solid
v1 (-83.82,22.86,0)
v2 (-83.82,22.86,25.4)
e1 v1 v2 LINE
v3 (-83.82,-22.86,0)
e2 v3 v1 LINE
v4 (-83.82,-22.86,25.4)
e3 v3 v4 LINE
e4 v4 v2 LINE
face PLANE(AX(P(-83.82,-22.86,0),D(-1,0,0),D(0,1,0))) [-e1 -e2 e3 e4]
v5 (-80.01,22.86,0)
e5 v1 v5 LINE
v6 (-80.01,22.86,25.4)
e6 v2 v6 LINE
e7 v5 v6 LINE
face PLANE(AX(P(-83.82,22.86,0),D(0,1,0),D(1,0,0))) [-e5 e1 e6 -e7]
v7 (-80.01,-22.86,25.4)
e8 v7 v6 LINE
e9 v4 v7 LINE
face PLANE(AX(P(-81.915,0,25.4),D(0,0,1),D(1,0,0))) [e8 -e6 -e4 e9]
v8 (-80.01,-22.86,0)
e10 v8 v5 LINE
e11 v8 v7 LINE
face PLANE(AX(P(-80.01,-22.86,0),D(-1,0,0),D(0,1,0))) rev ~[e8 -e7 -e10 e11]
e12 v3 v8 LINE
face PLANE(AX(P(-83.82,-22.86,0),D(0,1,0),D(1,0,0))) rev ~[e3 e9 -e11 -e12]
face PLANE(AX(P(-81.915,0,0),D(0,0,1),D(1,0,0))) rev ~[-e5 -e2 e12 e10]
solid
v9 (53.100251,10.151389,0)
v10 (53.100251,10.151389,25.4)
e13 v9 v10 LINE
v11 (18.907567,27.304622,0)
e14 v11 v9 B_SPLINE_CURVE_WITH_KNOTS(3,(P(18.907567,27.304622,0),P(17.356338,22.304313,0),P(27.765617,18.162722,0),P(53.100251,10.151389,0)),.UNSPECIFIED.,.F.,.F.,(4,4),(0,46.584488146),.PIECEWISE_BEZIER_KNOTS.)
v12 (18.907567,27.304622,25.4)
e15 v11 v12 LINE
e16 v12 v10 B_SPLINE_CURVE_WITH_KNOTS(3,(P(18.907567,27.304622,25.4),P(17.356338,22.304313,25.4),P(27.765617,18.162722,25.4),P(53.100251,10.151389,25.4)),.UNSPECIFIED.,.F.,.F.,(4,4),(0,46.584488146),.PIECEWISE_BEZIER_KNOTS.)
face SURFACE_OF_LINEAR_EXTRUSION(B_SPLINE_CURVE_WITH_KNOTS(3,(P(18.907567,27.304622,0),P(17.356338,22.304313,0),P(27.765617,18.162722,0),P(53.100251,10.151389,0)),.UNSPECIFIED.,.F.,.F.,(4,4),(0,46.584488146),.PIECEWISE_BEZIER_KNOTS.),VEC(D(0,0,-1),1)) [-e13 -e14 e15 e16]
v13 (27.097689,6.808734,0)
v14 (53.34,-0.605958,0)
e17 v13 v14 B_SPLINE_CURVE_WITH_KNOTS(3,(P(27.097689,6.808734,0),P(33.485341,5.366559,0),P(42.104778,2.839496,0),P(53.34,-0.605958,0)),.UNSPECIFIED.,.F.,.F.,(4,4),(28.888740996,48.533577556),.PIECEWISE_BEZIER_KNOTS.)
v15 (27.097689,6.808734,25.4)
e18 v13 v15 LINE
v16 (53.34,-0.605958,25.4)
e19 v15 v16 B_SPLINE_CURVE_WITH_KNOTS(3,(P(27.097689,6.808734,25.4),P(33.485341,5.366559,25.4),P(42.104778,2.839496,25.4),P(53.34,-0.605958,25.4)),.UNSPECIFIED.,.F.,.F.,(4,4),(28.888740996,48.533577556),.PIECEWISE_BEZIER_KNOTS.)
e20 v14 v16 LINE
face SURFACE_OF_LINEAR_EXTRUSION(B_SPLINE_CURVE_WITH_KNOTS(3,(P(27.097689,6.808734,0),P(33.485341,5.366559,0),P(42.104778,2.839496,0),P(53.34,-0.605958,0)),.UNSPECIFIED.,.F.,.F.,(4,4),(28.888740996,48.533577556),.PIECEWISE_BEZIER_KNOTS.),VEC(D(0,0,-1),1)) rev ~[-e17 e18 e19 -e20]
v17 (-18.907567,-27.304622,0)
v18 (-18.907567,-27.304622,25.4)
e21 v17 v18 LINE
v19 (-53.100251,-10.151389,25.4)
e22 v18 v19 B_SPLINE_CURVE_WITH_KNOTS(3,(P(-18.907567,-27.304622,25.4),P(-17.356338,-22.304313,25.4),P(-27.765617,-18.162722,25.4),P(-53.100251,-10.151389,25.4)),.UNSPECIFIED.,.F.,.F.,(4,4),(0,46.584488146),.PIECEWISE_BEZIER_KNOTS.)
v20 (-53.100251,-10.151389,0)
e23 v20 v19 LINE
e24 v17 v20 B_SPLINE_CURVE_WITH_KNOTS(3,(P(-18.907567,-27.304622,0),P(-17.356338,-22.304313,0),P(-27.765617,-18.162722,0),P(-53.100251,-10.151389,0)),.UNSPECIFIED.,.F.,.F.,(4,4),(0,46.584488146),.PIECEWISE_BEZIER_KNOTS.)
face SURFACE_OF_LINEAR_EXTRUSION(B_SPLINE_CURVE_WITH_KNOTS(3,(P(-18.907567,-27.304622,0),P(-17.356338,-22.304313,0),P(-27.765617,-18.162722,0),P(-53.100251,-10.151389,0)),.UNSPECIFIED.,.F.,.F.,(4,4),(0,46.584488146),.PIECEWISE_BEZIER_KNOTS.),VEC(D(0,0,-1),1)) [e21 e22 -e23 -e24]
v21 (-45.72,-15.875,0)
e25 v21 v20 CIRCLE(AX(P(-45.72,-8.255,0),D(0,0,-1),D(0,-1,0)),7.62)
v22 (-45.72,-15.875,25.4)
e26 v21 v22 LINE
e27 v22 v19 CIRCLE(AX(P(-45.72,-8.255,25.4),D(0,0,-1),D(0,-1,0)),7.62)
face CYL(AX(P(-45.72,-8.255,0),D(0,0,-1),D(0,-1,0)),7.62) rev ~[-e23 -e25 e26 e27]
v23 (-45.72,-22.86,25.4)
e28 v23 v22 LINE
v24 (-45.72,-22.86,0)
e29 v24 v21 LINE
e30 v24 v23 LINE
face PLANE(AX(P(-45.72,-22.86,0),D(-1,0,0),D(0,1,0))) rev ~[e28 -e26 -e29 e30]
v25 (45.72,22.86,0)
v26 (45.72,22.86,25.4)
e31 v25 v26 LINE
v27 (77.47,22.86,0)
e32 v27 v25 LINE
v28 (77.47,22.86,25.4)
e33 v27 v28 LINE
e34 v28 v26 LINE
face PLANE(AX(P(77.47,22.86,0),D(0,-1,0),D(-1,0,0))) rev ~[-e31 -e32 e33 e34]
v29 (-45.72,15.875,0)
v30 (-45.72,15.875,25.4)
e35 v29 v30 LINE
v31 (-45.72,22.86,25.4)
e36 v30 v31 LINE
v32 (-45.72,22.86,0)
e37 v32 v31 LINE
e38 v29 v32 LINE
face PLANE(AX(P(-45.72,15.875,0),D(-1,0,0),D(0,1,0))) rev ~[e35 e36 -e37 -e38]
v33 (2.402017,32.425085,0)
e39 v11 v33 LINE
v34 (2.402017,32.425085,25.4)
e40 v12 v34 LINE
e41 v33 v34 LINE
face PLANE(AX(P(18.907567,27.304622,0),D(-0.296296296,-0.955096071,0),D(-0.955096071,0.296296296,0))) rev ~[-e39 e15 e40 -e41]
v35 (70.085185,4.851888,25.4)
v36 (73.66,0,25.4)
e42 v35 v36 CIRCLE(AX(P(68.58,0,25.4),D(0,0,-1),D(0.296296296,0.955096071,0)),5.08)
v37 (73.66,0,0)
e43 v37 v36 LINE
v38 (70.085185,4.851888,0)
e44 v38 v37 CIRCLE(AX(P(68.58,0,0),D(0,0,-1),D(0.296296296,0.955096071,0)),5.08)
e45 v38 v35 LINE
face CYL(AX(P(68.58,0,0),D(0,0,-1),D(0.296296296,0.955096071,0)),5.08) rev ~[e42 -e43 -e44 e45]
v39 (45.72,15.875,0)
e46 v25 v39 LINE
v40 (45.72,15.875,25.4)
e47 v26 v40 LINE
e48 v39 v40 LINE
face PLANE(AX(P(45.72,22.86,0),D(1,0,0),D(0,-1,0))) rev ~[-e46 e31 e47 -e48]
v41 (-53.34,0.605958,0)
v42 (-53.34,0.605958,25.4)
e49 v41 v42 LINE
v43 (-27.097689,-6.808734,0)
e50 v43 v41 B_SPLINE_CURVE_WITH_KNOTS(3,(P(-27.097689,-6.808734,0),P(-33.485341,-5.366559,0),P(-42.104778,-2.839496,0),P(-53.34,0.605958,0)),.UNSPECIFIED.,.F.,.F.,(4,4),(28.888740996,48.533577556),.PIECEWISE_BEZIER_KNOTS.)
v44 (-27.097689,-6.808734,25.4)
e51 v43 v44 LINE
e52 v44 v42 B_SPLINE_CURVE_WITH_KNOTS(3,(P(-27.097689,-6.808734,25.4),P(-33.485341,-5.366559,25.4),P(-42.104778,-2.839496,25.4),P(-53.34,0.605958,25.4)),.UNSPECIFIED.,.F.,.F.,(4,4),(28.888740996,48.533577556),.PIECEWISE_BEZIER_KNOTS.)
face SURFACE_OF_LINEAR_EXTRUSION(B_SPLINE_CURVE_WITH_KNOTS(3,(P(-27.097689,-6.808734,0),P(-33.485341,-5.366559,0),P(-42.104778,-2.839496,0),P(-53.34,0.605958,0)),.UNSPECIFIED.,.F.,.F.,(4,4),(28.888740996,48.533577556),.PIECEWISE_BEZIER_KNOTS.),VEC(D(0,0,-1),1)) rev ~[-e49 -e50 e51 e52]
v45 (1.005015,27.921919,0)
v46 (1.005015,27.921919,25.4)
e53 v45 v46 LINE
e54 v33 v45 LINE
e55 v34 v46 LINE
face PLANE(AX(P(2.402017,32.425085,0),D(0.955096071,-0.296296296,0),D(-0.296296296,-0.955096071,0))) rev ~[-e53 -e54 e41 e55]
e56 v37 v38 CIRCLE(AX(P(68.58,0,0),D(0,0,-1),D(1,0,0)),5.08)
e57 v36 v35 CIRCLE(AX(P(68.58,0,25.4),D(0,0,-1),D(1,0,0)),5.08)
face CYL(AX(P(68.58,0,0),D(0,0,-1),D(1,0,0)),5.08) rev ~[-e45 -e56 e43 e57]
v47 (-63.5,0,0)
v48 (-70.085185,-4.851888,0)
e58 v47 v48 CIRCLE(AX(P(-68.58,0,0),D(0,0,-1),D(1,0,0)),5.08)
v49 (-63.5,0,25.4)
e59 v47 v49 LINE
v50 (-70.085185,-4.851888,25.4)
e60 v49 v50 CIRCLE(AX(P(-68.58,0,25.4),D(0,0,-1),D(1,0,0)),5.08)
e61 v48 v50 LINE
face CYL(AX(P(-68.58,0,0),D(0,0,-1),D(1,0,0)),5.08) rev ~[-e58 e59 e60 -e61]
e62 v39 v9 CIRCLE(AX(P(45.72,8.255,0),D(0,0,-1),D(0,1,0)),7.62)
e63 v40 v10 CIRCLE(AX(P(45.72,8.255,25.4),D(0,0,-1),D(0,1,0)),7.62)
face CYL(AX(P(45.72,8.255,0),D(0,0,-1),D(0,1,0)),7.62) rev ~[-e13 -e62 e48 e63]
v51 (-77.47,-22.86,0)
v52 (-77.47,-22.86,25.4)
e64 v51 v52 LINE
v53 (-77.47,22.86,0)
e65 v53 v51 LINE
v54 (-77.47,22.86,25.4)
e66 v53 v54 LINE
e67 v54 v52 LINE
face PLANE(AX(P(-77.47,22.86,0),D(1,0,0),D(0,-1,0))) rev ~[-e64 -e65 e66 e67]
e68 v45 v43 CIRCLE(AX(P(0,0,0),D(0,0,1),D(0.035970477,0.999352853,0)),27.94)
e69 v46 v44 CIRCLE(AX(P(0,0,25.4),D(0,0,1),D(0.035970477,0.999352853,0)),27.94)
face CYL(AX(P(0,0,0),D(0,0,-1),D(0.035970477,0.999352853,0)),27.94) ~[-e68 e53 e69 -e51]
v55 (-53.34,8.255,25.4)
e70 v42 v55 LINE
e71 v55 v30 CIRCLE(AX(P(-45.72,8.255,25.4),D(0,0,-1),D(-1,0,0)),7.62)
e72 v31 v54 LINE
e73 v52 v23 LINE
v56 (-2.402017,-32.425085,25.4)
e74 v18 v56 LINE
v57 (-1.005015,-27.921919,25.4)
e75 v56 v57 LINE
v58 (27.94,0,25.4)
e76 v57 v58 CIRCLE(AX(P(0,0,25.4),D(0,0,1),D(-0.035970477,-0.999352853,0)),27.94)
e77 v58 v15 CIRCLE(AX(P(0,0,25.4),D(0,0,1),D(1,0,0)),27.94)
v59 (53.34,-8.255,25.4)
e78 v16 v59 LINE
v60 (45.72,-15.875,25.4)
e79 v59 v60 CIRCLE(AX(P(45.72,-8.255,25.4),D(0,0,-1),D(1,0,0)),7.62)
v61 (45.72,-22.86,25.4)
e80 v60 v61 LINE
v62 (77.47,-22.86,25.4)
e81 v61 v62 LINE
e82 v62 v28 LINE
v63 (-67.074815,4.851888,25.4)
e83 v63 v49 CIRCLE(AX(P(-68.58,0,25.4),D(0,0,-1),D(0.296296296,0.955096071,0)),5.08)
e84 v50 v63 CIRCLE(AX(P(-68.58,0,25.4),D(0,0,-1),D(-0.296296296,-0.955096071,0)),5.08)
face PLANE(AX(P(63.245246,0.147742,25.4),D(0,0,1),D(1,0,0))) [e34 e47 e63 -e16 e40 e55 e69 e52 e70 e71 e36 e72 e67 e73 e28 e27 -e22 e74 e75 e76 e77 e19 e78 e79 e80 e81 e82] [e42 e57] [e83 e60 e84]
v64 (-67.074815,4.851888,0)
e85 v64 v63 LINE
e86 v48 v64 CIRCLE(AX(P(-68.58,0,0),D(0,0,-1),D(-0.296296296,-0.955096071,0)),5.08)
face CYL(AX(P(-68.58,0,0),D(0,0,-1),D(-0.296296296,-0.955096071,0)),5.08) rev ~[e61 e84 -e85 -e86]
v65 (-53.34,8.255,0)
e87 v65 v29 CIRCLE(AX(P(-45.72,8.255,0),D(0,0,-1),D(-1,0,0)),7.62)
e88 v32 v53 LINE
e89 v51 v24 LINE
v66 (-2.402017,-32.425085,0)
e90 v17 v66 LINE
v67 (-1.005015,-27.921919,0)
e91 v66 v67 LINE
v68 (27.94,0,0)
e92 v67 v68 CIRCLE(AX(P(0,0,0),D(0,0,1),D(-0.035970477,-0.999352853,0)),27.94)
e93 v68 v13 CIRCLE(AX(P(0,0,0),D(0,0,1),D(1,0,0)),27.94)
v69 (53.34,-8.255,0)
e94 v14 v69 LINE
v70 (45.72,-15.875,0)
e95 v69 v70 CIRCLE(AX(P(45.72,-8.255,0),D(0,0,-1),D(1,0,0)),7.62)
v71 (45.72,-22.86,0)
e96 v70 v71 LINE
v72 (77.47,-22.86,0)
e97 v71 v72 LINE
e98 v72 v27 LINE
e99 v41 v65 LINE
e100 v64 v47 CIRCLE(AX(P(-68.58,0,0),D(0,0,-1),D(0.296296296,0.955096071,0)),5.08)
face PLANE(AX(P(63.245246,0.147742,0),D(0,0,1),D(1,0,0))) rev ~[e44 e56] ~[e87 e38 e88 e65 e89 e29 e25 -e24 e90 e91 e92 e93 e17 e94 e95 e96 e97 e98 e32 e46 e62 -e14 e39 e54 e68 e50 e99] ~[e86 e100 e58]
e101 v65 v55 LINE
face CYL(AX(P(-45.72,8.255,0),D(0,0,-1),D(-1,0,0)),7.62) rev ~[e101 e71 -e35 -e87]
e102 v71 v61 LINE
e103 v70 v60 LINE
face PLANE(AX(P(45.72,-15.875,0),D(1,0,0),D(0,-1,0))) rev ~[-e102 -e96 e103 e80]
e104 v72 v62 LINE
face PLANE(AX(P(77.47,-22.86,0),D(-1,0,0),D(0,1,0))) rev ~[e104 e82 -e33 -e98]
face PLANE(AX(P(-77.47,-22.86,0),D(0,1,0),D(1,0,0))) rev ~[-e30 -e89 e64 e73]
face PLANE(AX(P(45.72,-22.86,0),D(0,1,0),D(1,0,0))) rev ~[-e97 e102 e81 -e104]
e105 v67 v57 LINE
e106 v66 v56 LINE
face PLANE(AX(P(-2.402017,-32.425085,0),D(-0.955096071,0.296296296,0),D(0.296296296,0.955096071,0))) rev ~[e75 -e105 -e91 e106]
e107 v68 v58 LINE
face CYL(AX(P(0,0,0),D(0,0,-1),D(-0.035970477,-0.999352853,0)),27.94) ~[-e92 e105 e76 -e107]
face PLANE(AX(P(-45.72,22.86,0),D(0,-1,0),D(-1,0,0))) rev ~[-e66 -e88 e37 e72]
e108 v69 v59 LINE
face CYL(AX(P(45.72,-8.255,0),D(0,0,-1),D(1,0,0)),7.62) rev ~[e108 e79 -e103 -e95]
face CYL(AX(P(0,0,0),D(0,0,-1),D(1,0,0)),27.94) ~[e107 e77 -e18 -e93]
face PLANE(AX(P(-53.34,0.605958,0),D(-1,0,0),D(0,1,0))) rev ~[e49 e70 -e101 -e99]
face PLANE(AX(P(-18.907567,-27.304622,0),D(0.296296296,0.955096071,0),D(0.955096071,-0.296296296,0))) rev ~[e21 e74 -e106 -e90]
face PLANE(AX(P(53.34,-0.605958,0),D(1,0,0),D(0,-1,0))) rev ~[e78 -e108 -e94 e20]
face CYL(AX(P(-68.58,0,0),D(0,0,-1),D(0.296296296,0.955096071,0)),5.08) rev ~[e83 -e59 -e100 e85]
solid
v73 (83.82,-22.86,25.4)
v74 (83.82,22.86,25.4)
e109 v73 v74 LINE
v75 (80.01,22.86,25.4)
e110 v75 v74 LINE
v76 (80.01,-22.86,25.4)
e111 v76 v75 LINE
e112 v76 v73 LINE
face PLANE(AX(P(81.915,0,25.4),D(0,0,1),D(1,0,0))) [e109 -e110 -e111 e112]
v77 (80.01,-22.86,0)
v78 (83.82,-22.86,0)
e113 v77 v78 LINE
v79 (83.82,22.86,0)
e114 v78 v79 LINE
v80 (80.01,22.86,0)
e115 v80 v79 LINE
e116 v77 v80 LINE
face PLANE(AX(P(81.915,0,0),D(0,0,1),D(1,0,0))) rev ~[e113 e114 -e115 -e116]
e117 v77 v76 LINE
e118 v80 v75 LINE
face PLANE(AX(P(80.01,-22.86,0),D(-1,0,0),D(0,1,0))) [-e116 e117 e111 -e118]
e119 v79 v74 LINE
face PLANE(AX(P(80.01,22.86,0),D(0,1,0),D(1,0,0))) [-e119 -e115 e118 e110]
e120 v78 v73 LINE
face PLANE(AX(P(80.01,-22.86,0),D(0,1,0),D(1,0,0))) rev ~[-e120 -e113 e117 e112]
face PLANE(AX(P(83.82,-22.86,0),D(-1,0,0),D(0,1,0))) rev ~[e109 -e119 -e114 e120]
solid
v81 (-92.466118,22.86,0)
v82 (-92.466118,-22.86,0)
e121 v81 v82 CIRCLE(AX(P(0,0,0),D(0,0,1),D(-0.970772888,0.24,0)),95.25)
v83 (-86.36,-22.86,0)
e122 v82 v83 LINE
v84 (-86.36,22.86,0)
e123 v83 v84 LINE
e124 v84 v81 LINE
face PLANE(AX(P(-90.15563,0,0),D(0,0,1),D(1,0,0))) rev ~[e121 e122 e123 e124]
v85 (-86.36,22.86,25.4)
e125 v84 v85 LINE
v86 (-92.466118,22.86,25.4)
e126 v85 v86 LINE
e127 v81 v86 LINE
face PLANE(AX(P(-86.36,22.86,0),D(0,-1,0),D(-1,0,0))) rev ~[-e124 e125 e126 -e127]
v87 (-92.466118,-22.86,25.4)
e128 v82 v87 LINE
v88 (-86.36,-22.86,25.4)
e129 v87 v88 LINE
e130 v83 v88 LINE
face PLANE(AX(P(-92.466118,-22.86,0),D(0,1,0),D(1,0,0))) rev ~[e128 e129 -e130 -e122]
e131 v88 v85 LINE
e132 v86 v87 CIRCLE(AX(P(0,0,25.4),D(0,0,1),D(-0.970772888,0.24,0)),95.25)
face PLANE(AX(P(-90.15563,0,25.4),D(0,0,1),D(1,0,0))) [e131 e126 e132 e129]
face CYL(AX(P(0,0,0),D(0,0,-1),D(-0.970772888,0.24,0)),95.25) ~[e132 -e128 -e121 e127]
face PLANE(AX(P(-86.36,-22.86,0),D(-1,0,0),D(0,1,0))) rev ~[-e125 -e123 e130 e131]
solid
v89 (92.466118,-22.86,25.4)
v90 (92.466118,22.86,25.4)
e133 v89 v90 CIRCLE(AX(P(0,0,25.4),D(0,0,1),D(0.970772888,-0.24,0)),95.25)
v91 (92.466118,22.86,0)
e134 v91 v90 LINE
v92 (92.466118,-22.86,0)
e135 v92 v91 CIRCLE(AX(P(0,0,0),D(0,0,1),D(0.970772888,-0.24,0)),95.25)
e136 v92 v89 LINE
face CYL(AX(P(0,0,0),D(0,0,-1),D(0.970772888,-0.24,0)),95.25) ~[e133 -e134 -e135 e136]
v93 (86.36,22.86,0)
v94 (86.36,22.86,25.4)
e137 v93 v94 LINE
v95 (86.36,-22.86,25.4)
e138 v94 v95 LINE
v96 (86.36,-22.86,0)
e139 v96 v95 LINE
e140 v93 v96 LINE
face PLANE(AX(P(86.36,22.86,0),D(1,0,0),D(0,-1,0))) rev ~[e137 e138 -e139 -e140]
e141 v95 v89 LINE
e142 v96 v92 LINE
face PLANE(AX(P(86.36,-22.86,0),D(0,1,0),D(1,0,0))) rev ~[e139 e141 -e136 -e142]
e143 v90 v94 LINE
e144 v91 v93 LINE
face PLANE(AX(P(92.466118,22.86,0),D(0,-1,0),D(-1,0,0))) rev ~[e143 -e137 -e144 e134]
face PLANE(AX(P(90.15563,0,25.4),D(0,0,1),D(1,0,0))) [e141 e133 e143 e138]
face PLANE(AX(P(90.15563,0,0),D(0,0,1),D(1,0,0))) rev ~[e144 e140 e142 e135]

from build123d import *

# Parameters (mm, degrees)
F0_DEPTH = 25.4
F1_W     = 3.81
F1_H     = 45.72


with BuildPart() as f0:
    # F1 (on Top) → F0 (new body)
    with BuildSketch(Plane.XY):
        with BuildLine():
            Line((77.47, 22.86), (45.72, 22.86))
            Line((45.72, 22.86), (45.72, 15.875))
            ThreePointArc((45.72, 15.875), (50.3897919484, 14.2764153784), (53.1002511947, 10.1513892806))
            add(Edge.make_bspline(
                [(53.1002511947, 10.1513892806), (58.1589510072, 8.551724236), (63.812727866, 6.7977717351), (70.0851851843, 4.8518880408)],
                knots=[46.5844881463, 46.5844881463, 46.5844881463, 46.5844881463, 55.8862582945, 55.8862582945, 55.8862582945, 55.8862582945], degree=3))
            ThreePointArc((70.0851851843, 4.8518880408), (72.6697885481, 3.0133087515), (73.66, 0))
            ThreePointArc((73.66, 0), (71.5933087511, -4.0897885484), (67.0748148148, -4.8518880406))
            add(Edge.make_bspline(
                [(53.34, -0.6059576), (57.5451254916, -1.8955240295), (62.1166858374, -3.3137440808), (67.0748148148, -4.8518880406)],
                knots=[48.5335775556, 48.5335775556, 48.5335775556, 48.5335775556, 55.8862582953, 55.8862582953, 55.8862582953, 55.8862582953], degree=3))
            Line((53.34, -0.6059576), (53.34, -8.255))
            ThreePointArc((53.34, -8.255), (51.1081536726, -13.6431536726), (45.72, -15.875))
            Line((45.72, -15.875), (45.72, -22.86))
            Line((45.72, -22.86), (77.47, -22.86))
            Line((77.47, -22.86), (77.47, 22.86))
        make_face()
        with BuildLine():
            add(Edge.make_bspline(
                [(53.1002511947, 10.1513892806), (58.1589510072, 8.551724236), (63.812727866, 6.7977717351), (70.0851851843, 4.8518880408)],
                knots=[46.5844881463, 46.5844881463, 46.5844881463, 46.5844881463, 55.8862582945, 55.8862582945, 55.8862582945, 55.8862582945], degree=3))
            ThreePointArc((53.1002511947, 10.1513892806), (53.2798251998, 9.210742093), (53.34, 8.255))
            Line((53.34, 8.255), (53.34, -0.6059576))
            add(Edge.make_bspline(
                [(53.34, -0.6059576), (57.5451254916, -1.8955240295), (62.1166858374, -3.3137440808), (67.0748148148, -4.8518880406)],
                knots=[48.5335775556, 48.5335775556, 48.5335775556, 48.5335775556, 55.8862582953, 55.8862582953, 55.8862582953, 55.8862582953], degree=3))
            ThreePointArc((67.0748148148, -4.8518880406), (63.7281119593, 1.5051851848), (70.0851851843, 4.8518880408))
        make_face()
        with BuildLine():
            ThreePointArc((53.34, 8.255), (53.2798251998, 9.210742093), (53.1002511947, 10.1513892806))
            add(Edge.make_bspline(
                [(18.9075672089, 27.3046224959), (17.3563376005, 22.3043125946), (27.7656172811, 18.1627221903), (53.1002511947, 10.1513892806)],
                knots=[0, 0, 0, 0, 46.5844881463, 46.5844881463, 46.5844881463, 46.5844881463], degree=3))
            Line((18.9075672089, 27.3046224959), (2.4020174164, 32.4250846362))
            Line((2.4020174164, 32.4250846362), (1.0050151405, 27.9219187121))
            ThreePointArc((1.0050151405, 27.9219187121), (17.5750428532, 21.7200706423), (27.0976887869, 6.8087342735))
            add(Edge.make_bspline(
                [(27.0976887869, 6.8087342735), (33.4853412167, 5.3665593675), (42.104777648, 2.8394961928), (53.34, -0.6059576)],
                knots=[28.888740996, 28.888740996, 28.888740996, 28.888740996, 48.5335775556, 48.5335775556, 48.5335775556, 48.5335775556], degree=3))
            Line((53.34, -0.6059576), (53.34, 8.255))
        make_face()
        with BuildLine():
            ThreePointArc((27.94, 0), (27.7286226191, 3.4303188841), (27.0976887869, 6.8087342735))
            ThreePointArc((27.0976887869, 6.8087342735), (17.5750428532, 21.7200706423), (1.0050151405, 27.9219187121))
            ThreePointArc((1.0050151405, 27.9219187121), (-21.7200706423, 17.5750428532), (-27.0976887869, -6.8087342735))
            ThreePointArc((-27.0976887869, -6.8087342735), (-17.5750428532, -21.7200706423), (-1.0050151405, -27.9219187121))
            ThreePointArc((-1.0050151405, -27.9219187121), (19.3979828458, -20.108750869), (27.94, 0))
        make_face()
        with BuildLine():
            ThreePointArc((-1.0050151405, -27.9219187121), (-17.5750428532, -21.7200706423), (-27.0976887869, -6.8087342735))
            add(Edge.make_bspline(
                [(-27.0976887869, -6.8087342735), (-33.4853412167, -5.3665593675), (-42.104777648, -2.8394961928), (-53.34, 0.6059576)],
                knots=[28.888740996, 28.888740996, 28.888740996, 28.888740996, 48.5335775556, 48.5335775556, 48.5335775556, 48.5335775556], degree=3))
            Line((-53.34, 0.6059576), (-53.34, -8.255))
            ThreePointArc((-53.34, -8.255), (-53.2798251998, -9.210742093), (-53.1002511947, -10.1513892806))
            add(Edge.make_bspline(
                [(-18.9075672089, -27.3046224959), (-17.3563376005, -22.3043125946), (-27.7656172811, -18.1627221903), (-53.1002511947, -10.1513892806)],
                knots=[0, 0, 0, 0, 46.5844881463, 46.5844881463, 46.5844881463, 46.5844881463], degree=3))
            Line((-18.9075672089, -27.3046224959), (-2.4020174164, -32.4250846362))
            Line((-2.4020174164, -32.4250846362), (-1.0050151405, -27.9219187121))
        make_face()
        with BuildLine():
            add(Edge.make_bspline(
                [(-53.34, 0.6059576), (-57.5451254916, 1.8955240295), (-62.1166858374, 3.3137440808), (-67.0748148148, 4.8518880406)],
                knots=[48.5335775556, 48.5335775556, 48.5335775556, 48.5335775556, 55.8862582953, 55.8862582953, 55.8862582953, 55.8862582953], degree=3))
            Line((-53.34, 0.6059576), (-53.34, 8.255))
            ThreePointArc((-53.34, 8.255), (-51.1081536726, 13.6431536726), (-45.72, 15.875))
            Line((-45.72, 15.875), (-45.72, 22.86))
            Line((-45.72, 22.86), (-77.47, 22.86))
            Line((-77.47, 22.86), (-77.47, -22.86))
            Line((-77.47, -22.86), (-45.72, -22.86))
            Line((-45.72, -22.86), (-45.72, -15.875))
            ThreePointArc((-45.72, -15.875), (-50.3897919484, -14.2764153784), (-53.1002511947, -10.1513892806))
            add(Edge.make_bspline(
                [(-53.1002511947, -10.1513892806), (-58.1589510072, -8.551724236), (-63.812727866, -6.7977717351), (-70.0851851843, -4.8518880408)],
                knots=[46.5844881463, 46.5844881463, 46.5844881463, 46.5844881463, 55.8862582945, 55.8862582945, 55.8862582945, 55.8862582945], degree=3))
            ThreePointArc((-70.0851851843, -4.8518880408), (-73.4318880407, 1.5051851848), (-67.0748148148, 4.8518880406))
        make_face()
        with BuildLine():
            Line((-53.34, -8.255), (-53.34, 0.6059576))
            add(Edge.make_bspline(
                [(-53.34, 0.6059576), (-57.5451254916, 1.8955240295), (-62.1166858374, 3.3137440808), (-67.0748148148, 4.8518880406)],
                knots=[48.5335775556, 48.5335775556, 48.5335775556, 48.5335775556, 55.8862582953, 55.8862582953, 55.8862582953, 55.8862582953], degree=3))
            ThreePointArc((-67.0748148148, 4.8518880406), (-64.4902114516, 3.0133087511), (-63.5, 0))
            ThreePointArc((-63.5, 0), (-65.5666912485, -4.0897885481), (-70.0851851843, -4.8518880408))
            add(Edge.make_bspline(
                [(-53.1002511947, -10.1513892806), (-58.1589510072, -8.551724236), (-63.812727866, -6.7977717351), (-70.0851851843, -4.8518880408)],
                knots=[46.5844881463, 46.5844881463, 46.5844881463, 46.5844881463, 55.8862582945, 55.8862582945, 55.8862582945, 55.8862582945], degree=3))
            ThreePointArc((-53.1002511947, -10.1513892806), (-53.2798251998, -9.210742093), (-53.34, -8.255))
        make_face()
    extrude(amount=F0_DEPTH)


with BuildPart() as f0b:
    # F1 (on Top) → F0, piece 2 (new body)
    with BuildSketch(Plane.XY):
        with BuildLine():
            Line((92.4661175783, 22.86), (86.36, 22.86))
            Line((86.36, 22.86), (86.36, -22.86))
            Line((86.36, -22.86), (92.4661175783, -22.86))
            ThreePointArc((92.4661175783, -22.86), (95.25, 0), (92.4661175783, 22.86))
        make_face()
    extrude(amount=F0_DEPTH)


with BuildPart() as f0c:
    # F1 (on Top) → F0, piece 3 (new body)
    with BuildSketch(Plane.XY):
        with Locations((81.915, 0)):
            Rectangle(F1_W, F1_H)
    extrude(amount=F0_DEPTH)


with BuildPart() as f0d:
    # F1 (on Top) → F0, piece 4 (new body)
    with BuildSketch(Plane.XY):
        with Locations((-81.915, 0)):
            Rectangle(F1_W, F1_H)
    extrude(amount=F0_DEPTH)


with BuildPart() as f0e:
    # F1 (on Top) → F0, piece 5 (new body)
    with BuildSketch(Plane.XY):
        with BuildLine():
            Line((-92.4661175783, -22.86), (-86.36, -22.86))
            Line((-86.36, -22.86), (-86.36, 22.86))
            Line((-86.36, 22.86), (-92.4661175783, 22.86))
            ThreePointArc((-92.4661175783, 22.86), (-95.25, 0), (-92.4661175783, -22.86))
        make_face()
    extrude(amount=F0_DEPTH)


solid = Compound([f0.part, f0b.part, f0c.part, f0d.part, f0e.part])
